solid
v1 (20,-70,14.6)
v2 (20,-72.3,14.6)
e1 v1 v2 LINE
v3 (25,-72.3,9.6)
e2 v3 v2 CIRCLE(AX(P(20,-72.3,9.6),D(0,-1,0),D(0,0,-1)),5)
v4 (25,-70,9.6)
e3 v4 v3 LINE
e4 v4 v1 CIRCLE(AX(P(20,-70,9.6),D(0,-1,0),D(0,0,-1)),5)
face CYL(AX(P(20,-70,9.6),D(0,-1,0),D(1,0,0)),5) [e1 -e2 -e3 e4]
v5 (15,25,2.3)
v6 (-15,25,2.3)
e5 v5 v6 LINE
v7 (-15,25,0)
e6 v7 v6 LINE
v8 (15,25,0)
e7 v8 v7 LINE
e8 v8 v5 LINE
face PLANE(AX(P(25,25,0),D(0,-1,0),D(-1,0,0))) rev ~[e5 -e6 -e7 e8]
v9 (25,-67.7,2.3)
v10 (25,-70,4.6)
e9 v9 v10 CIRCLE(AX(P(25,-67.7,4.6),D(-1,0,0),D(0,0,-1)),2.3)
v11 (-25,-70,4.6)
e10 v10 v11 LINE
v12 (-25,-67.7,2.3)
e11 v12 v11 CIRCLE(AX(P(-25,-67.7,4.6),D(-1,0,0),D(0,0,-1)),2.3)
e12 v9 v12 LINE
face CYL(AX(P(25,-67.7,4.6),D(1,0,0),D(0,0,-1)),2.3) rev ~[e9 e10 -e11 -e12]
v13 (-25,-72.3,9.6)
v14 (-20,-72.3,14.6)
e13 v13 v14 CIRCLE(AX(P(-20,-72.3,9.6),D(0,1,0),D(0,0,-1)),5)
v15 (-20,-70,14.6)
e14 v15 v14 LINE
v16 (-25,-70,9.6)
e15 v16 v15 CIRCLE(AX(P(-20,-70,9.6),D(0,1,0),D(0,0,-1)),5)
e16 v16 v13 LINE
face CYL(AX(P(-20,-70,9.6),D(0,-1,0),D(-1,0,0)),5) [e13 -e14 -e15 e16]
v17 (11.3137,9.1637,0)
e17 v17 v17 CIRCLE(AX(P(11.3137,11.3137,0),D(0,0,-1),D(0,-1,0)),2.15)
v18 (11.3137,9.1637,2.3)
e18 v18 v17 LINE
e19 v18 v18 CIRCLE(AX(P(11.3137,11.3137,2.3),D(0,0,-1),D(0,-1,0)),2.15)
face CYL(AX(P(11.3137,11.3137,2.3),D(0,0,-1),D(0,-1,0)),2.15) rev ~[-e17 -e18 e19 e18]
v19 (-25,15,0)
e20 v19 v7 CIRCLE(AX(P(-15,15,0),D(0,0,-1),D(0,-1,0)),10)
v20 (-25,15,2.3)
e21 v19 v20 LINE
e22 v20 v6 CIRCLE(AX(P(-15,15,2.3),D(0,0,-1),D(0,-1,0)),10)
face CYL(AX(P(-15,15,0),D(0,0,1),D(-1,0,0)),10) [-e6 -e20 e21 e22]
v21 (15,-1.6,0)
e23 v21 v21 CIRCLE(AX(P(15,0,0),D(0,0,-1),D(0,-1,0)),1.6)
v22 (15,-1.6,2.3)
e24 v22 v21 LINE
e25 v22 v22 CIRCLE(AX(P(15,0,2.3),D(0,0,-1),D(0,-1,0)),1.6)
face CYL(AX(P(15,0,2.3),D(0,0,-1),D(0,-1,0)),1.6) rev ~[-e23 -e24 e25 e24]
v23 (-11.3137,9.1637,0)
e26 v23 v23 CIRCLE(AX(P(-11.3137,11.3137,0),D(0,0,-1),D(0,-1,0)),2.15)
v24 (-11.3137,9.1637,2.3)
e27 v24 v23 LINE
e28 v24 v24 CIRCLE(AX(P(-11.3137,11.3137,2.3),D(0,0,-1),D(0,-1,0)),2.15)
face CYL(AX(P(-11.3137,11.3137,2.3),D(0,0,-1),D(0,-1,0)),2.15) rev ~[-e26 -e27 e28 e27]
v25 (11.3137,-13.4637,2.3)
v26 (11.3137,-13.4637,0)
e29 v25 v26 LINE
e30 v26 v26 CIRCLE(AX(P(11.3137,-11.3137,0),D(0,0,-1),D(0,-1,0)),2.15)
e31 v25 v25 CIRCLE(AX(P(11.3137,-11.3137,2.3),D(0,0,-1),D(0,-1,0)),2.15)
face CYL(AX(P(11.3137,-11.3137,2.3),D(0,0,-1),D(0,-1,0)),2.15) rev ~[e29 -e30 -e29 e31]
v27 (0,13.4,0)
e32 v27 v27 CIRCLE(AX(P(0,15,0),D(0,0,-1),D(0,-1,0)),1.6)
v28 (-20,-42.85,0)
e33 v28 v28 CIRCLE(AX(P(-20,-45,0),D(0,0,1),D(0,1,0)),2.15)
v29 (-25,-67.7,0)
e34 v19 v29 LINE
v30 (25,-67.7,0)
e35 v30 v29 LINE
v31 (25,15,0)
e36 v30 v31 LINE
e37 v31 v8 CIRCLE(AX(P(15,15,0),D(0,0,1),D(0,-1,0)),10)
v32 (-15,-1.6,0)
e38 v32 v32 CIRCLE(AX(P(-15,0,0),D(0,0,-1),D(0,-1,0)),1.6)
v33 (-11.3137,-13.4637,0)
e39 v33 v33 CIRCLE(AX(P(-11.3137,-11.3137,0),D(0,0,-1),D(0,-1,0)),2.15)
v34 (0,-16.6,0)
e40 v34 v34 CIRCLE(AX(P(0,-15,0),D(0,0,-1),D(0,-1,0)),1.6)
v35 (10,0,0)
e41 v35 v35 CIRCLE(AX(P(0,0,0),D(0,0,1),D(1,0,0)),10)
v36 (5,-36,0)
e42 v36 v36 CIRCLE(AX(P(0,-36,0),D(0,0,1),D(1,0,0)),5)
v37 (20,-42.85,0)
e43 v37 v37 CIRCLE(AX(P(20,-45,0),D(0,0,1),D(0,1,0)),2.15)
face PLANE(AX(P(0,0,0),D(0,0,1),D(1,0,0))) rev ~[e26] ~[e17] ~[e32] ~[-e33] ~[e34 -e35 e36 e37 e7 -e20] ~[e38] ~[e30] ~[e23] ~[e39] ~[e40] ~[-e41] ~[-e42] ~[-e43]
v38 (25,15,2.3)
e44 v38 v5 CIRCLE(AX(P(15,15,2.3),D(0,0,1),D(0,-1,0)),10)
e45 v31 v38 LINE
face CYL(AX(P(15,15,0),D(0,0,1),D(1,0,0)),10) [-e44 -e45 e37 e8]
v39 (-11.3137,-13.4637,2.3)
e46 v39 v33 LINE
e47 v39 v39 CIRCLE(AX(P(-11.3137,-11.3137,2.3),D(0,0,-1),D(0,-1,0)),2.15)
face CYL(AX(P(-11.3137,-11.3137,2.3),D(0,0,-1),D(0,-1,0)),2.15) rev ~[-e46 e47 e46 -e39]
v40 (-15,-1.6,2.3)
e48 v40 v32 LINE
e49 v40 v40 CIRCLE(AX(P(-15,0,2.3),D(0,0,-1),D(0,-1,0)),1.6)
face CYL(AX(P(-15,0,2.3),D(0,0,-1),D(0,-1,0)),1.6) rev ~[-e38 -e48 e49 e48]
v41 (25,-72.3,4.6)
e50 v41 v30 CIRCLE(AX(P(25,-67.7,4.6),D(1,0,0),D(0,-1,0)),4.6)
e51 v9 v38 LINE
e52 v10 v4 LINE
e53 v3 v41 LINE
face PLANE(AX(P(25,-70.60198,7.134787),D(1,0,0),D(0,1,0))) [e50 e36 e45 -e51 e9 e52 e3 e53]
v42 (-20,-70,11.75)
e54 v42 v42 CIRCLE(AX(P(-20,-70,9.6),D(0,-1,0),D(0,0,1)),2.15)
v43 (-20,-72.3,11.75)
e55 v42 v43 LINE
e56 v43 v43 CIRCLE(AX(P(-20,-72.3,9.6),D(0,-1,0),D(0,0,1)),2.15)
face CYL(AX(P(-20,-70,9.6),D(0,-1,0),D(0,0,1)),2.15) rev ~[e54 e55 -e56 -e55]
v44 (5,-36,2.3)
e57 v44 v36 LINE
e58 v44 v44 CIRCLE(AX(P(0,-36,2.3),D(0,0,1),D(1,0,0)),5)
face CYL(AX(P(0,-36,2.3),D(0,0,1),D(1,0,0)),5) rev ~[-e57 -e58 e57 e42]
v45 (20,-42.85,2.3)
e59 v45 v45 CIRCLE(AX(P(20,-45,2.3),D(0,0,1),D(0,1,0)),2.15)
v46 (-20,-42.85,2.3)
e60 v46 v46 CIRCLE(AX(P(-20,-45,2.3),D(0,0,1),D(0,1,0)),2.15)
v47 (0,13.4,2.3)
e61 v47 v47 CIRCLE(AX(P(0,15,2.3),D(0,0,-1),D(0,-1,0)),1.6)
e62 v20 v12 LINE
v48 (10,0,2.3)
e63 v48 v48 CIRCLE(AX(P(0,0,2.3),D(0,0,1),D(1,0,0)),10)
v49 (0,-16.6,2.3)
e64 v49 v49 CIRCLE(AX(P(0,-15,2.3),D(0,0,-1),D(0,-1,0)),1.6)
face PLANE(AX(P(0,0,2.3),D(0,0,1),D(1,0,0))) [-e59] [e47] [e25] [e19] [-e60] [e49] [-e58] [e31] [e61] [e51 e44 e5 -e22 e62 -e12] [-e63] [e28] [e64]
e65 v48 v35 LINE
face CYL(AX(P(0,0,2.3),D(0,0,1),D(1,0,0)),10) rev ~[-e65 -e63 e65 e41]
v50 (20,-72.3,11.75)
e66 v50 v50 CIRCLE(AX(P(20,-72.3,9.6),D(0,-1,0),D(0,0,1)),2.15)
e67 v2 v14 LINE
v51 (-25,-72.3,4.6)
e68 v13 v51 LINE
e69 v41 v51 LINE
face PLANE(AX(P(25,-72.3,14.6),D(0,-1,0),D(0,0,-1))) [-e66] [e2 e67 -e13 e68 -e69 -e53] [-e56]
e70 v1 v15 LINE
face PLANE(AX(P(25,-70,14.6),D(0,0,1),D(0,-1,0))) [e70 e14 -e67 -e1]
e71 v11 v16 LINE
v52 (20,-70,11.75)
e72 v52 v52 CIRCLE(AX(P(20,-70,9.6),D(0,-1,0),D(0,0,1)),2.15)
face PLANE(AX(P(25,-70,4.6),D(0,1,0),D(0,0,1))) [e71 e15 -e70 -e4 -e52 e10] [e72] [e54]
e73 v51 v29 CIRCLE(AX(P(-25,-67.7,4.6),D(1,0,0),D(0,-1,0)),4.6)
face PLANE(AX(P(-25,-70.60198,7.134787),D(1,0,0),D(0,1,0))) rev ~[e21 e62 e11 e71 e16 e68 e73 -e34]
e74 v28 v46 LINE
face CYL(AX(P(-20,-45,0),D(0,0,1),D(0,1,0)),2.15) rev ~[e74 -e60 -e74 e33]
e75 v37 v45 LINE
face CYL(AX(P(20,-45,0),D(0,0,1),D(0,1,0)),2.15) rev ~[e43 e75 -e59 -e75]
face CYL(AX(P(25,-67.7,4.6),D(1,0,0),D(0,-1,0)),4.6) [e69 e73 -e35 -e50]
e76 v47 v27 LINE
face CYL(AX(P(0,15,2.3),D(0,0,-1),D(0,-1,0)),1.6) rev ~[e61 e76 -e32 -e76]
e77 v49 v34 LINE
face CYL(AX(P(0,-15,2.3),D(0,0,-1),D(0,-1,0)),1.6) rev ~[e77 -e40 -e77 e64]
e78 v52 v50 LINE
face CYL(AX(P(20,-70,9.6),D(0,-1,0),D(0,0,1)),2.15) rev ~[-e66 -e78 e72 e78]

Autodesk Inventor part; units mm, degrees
ref_plane "YZ Plane" through (0, 0, 0) normal (1, 0, 0) x (0, 1, 0)
ref_plane "XZ Plane" through (0, 0, 0) normal (0, 1, 0) x (-1, 0, 0)
ref_plane "XY Plane" through (0, 0, 0) normal (0, 0, 1) x (1, 0, 0)
sketch "スケッチ1" plane through (0, 0, 0) normal (0, 0, 1) x (1, 0, 0)
  line L0 (-25, -72.3) -> (25, -72.3)
  line L1 (25, -72.3) -> (25, 25)
  line L2 (25, 25) -> (-25, 25)
  line L3 (-25, 25) -> (-25, -72.3)
  line L4 (-25, -72.3) -> (25, 25) construction
  line L5 (25, -72.3) -> (-25, 25) construction
  circle A0 centre (0, 0) radius 19 construction
  point P0 (0, -23.65)
  point P1 (0, -23.65)
  dimension "d0" = 38
  dimension "d1" = 50
  dimension "d2" = 25
  dimension "d3" = 72.3
extrude "プレート1" add sketch "スケッチ1" along normal blind 2.3
sketch "スケッチ9" plane through (25, -70, 0) normal (0, -1, 0) x (1, 0, 0)
  line L0 (-50, 0) -> (0, 0)
  line L1 (0, 0) -> (0, 14.6)
  line L2 (0, 14.6) -> (-50, 14.6)
  line L3 (-50, 14.6) -> (-50, 0)
edge flange "フランジ3" height 14.6 angle 90 thickness 2.3 bend radius 2.3 thickness toward (0, -1, 0) relief tear relief width 2.3 relief depth 1.15 edges at (0, -72.3, 2.3) wall of the first edge with corners at (-25, -70, 0) (25, -70, 0) (25, -70, 14.6) (-25, -70, 14.6)
bend "曲げ3"
corner "コーナー3"
fillet "コーナーR1" radius 5 2 edges at (25, -71.15, 14.6) (-25, -71.15, 14.6)
sketch "スケッチ4" plane through (0, 0, 2.3) normal (0, 0, 1) x (1, 0, 0)
  circle A0 centre (0, 0) radius 15
  point P0 (0, 15)
  point P1 (-15, 0)
  point P2 (0, -15)
  point P3 (15, 0)
  dimension "d26" = 30
  dimension "d29" = 360
hole "穴1" at (0, 15, 2.3) at (-15, 0, 2.3) at (0, -15, 2.3) at (15, 0, 2.3) direction (0, 0, -1) diameter 3.2 end through all clearance for "Flat Head Machine Screw" size "M3" standard "Ansi Metric M Profile"
sketch "スケッチ5" plane through (0, 0, 2.3) normal (0, 0, 1) x (1, 0, 0)
  circle A0 centre (0, 0) radius 16
  point P0 (-11.3137, 11.3137)
  point P1 (-11.3137, -11.3137)
  point P2 (11.3137, -11.3137)
  point P3 (11.3137, 11.3137)
  dimension "d38" = 32
  dimension "d41" = 360
hole "穴2" at (-11.3137, 11.3137, 2.3) at (-11.3137, -11.3137, 2.3) at (11.3137, -11.3137, 2.3) at (11.3137, 11.3137, 2.3) direction (0, 0, -1) diameter 4.3 end through all clearance for "Flat Head Machine Screw" size "M4" standard "Ansi Metric M Profile"
sketch "スケッチ6" plane through (0, 0, 2.3) normal (0, 0, 1) x (1, 0, 0)
  circle A0 centre (0, 0) radius 10
  dimension "d50" = 20
extrude "押し出し1" cut sketch "スケッチ6" against normal blind 10
sketch "スケッチ7" plane through (-25, -70, -2.3) normal (0, 1, 0) x (1, 0, 0)
  line L0 (5, -16.9) -> (45, -16.9) projected
  line L1 (0, -6.9) -> (0, -11.9) projected
  line L2 (50, -6.9) -> (50, -11.9) projected
  point P0 (18, -2.3)
  point P1 (45, -11.9)
  point P2 (5, -11.9)
  dimension "d76" = 5
  dimension "d77" = 5
  dimension "d78" = 5
hole "穴3" at (20, -70, 9.6) at (-20, -70, 9.6) direction (0, -1, 0) diameter 4.3 end through all clearance for "Flat Head Machine Screw" size "M4" standard "Ansi Metric M Profile"
fillet "コーナーR3" radius 10 2 edges at (-25, 25, 1.15) (25, 25, 1.15)
sketch "スケッチ10" plane through (0, 0, 0) normal (0, 0, -1) x (-1, 0, 0)
  line L0 (-25, -67.7) -> (-25, 15) projected
  line L1 (25, 15) -> (25, -67.7) projected
  circle A0 centre (-20, -45) radius 4
  circle A1 centre (0, 0) radius 45
  point P0 (20, -45)
  dimension "d80" = 5
  dimension "d81" = 5
  dimension "d82" = 45
  dimension "d83" = 8
  dimension "d84" = 90
hole "穴4" at (20, -45, 0) at (-20, -45, 0) direction (0, 0, 1) diameter 4.3 end through all clearance for "Flat Head Machine Screw" size "M4" standard "Ansi Metric M Profile"
sketch "スケッチ11" plane through (0, 0, 2.3) normal (0, 0, 1) x (1, 0, 0)
  circle A0 centre (0, -36) radius 5
  point P0 (0, 0)
  dimension "d92" = 10
  dimension "d93" = 36
extrude "押し出し3" cut sketch "スケッチ11" against normal blind 10
equation "\"d36\" = Thickness"
equation "\"d48\" = Thickness"
equation "\"d77\" = d76"
equation "\"d61\" = Thickness"
equation "\"d90\" = Thickness"
equation "\"d4\" = Thickness"
equation "\"d66\" = BendReliefWidth"
equation "\"d67\" = BendReliefDepth"
equation "\"d68\" = MinimumRemnant"
equation "\"d69\" = TransitionRadius"
equation "\"d72\" = BendRadius"
equation "\"d73\" = CornerReliefSize"
equation "\"d74\" = GapSize"
equation "\"d75\" = JacobiRadiusSize"
equation "\"d2\" = 0.5 * d1"
equation "\"BendRadius\" = Thickness"
equation "\"BendReliefWidth\" = Thickness"
equation "\"BendReliefDepth\" = 0.5 * Thickness"
equation "\"CornerReliefSize\" = 4 * Thickness"
equation "\"MinimumRemnant\" = 2 * Thickness"
equation "\"TransitionRadius\" = BendRadius"
equation "\"JacobiRadiusSize\" = BendRadius"
equation "\"GapSize\" = Thickness"
equation "\"Thickness\" = 2.3"
properties part number "plate8" material "鋼、炭素鋼"
